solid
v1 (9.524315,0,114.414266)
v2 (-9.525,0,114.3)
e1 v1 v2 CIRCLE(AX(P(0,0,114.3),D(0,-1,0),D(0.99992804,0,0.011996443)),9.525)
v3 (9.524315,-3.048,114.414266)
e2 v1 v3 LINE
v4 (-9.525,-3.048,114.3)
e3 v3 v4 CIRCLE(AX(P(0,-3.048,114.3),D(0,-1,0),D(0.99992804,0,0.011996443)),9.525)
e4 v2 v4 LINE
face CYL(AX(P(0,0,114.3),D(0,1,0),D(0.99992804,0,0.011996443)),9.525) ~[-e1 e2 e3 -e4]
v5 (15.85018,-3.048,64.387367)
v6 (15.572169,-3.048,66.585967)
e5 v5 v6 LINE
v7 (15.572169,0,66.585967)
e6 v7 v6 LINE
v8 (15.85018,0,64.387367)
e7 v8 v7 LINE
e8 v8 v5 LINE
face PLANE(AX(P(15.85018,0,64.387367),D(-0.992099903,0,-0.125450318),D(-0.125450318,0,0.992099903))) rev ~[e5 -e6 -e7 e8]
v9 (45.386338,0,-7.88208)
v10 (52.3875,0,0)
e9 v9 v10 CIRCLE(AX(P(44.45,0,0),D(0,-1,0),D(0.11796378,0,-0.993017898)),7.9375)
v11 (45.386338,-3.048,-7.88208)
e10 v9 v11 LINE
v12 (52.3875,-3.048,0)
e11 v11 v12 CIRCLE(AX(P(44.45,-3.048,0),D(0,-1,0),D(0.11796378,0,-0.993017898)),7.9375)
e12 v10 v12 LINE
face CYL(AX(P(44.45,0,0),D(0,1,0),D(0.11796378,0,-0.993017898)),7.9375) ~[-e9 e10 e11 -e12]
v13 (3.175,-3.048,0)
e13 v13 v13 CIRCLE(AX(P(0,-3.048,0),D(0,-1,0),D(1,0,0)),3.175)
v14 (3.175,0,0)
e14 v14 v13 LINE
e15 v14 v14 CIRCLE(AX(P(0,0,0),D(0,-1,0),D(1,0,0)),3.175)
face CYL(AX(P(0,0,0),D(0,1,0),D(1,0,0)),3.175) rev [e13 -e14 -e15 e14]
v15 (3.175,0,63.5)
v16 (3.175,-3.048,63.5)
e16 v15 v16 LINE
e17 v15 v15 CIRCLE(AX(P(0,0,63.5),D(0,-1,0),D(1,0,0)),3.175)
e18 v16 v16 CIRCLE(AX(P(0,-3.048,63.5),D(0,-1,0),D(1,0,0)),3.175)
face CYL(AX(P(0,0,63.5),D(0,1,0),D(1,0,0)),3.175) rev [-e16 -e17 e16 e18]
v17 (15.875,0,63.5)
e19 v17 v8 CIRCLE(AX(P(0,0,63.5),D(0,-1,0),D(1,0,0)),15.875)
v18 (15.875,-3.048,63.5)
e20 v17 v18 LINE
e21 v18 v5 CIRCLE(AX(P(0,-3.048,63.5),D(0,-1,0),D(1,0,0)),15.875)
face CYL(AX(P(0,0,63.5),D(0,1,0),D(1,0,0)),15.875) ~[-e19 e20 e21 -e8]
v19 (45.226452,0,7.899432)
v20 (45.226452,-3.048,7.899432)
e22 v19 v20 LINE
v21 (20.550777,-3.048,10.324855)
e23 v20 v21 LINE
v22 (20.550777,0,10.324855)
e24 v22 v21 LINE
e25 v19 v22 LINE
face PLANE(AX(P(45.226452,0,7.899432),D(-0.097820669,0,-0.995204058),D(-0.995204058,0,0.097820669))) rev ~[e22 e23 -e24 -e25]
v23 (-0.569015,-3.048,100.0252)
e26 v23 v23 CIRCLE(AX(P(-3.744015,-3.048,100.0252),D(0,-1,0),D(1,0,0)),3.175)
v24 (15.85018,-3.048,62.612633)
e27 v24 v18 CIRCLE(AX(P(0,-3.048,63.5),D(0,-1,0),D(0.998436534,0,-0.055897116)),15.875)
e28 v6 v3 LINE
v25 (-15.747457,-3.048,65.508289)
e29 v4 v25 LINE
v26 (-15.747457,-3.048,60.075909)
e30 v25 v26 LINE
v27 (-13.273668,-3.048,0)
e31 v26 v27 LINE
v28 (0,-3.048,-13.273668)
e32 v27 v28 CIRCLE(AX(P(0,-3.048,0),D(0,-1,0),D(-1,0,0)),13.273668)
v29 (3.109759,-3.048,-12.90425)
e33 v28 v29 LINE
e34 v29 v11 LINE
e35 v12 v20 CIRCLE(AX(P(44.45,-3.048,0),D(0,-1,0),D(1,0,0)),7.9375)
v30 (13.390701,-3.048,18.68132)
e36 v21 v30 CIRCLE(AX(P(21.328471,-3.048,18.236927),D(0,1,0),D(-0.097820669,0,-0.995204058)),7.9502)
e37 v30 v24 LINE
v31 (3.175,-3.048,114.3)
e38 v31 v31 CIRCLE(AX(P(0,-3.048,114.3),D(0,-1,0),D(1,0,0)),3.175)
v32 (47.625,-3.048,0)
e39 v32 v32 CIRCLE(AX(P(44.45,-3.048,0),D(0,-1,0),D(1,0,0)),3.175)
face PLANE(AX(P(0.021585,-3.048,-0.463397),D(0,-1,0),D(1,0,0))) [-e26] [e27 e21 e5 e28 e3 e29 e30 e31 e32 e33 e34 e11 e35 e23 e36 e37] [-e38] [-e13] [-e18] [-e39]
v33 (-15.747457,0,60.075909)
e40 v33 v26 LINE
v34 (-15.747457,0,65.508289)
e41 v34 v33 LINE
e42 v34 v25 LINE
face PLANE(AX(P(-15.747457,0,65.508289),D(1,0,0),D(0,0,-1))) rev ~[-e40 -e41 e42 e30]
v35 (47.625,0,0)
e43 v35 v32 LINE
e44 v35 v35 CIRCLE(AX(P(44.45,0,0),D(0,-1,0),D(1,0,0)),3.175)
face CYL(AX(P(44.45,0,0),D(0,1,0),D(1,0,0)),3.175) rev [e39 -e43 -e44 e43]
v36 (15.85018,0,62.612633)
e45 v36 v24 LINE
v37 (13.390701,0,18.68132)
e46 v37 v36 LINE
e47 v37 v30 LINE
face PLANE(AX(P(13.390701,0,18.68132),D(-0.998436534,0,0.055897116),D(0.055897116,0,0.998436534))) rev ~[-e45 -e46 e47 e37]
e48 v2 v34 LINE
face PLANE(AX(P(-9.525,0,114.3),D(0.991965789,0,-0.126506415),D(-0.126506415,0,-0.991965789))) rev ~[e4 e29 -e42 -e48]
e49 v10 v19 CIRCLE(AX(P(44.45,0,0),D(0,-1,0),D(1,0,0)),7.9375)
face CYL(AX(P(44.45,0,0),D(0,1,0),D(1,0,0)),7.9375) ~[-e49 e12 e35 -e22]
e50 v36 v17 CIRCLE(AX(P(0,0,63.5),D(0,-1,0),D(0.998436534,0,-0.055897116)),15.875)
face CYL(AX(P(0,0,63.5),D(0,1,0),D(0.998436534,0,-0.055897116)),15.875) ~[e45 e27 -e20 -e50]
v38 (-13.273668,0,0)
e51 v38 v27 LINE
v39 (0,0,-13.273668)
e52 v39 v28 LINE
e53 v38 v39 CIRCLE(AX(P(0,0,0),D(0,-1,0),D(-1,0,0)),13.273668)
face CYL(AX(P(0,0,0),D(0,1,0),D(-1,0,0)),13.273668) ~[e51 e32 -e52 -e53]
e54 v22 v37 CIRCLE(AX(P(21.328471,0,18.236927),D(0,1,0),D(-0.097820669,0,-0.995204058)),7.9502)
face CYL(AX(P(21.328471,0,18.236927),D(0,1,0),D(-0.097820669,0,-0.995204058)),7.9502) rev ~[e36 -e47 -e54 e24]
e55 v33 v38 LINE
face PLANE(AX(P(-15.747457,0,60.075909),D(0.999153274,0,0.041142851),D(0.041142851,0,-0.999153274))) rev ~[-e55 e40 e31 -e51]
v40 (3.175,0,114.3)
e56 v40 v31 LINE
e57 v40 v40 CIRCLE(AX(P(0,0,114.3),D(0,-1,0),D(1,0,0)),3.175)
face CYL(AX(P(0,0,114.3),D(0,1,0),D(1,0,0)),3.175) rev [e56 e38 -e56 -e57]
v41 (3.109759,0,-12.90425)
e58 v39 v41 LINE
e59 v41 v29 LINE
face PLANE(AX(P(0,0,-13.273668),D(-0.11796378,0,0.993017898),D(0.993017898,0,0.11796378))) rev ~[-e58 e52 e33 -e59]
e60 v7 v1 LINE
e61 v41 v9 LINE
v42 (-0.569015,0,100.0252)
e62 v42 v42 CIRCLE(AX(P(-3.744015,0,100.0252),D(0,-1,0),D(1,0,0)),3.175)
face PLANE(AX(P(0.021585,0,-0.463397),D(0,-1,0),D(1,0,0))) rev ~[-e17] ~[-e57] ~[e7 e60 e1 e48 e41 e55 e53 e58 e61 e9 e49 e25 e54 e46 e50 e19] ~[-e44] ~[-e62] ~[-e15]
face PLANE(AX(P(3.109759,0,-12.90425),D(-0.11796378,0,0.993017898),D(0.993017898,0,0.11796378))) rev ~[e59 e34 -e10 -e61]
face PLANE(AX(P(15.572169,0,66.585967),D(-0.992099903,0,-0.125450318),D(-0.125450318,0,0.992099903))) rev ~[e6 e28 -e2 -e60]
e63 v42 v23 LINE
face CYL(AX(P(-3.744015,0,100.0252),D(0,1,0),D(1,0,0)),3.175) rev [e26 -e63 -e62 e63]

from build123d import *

# Parameters (mm, degrees)
F0_R     = 3.175
F1_DEPTH = 3.048


with BuildPart() as f1:
    # F0 (on Front) → F1 (new body)
    with BuildSketch(Plane.XZ):
        with BuildLine():
            ThreePointArc((3.1097588161, -12.904249902), (10.427563759, -8.2131710978), (13.2736681226, 0))
            ThreePointArc((13.2736681226, 0), (0, 13.2736681226), (-13.2736681226, 0))
            ThreePointArc((-13.2736681226, 0), (-9.3859007407, -9.3859007407), (0, -13.2736681226))
            Line((0, -13.2736681226), (3.1097588161, -12.904249902))
        make_face()
        Circle(F0_R, mode=Mode.SUBTRACT)
        with BuildLine():
            ThreePointArc((-13.2736681226, 0), (0, 13.2736681226), (13.2736681226, 0))
            ThreePointArc((13.2736681226, 0), (10.427563759, -8.2131710978), (3.1097588161, -12.904249902))
            Line((3.1097588161, -12.904249902), (45.3863375042, -7.8820795688))
            ThreePointArc((45.3863375042, -7.8820795688), (36.5129073275, -0.0804124208), (45.2264515588, 7.8994322091))
            Line((45.2264515588, 7.8994322091), (20.5507771811, 10.3248553698))
            ThreePointArc((20.5507771811, 10.3248553698), (15.2912984453, 13.0640911975), (13.39070093, 18.6813199251))
            Line((13.39070093, 18.6813199251), (15.8501799769, 62.6126332776))
            ThreePointArc((15.8501799769, 62.6126332776), (0.5628098086, 47.6349796685), (-15.7474569047, 61.4917106696))
            Line((-15.7474569047, 61.4917106696), (-15.7474569047, 60.0759088993))
            Line((-15.7474569047, 60.0759088993), (-13.2736681226, 0))
        make_face()
        with BuildLine():
            ThreePointArc((45.2264515588, 7.8994322091), (36.5129073275, -0.0804124208), (45.3863375042, -7.8820795688))
            ThreePointArc((45.3863375042, -7.8820795688), (50.3844791342, -5.2712298048), (52.3875, 0))
            ThreePointArc((52.3875, 0), (50.3307733547, 5.3310797219), (45.2264515588, 7.8994322091))
        make_face()
        with Locations((44.45, 0)):
            Circle(F0_R, mode=Mode.SUBTRACT)
        with BuildLine():
            Line((-15.7474569047, 65.5082893304), (-15.7474569047, 61.4917106696))
            ThreePointArc((-15.7474569047, 61.4917106696), (0.5628098086, 47.6349796685), (15.8501799769, 62.6126332776))
            ThreePointArc((15.8501799769, 62.6126332776), (15.8687937811, 63.0561431161), (15.875, 63.5))
            ThreePointArc((15.875, 63.5), (15.8687937811, 63.9438568839), (15.8501799769, 64.3873667224))
            Line((15.8501799769, 64.3873667224), (15.5721686032, 66.5859666221))
            ThreePointArc((15.5721686032, 66.5859666221), (-0.5459199423, 79.3656104962), (-15.7474569047, 65.5082893304))
        make_face()
        with Locations((0, 63.5)):
            Circle(F0_R, mode=Mode.SUBTRACT)
        with BuildLine():
            Line((-9.525, 114.3), (-15.7474569047, 65.5082893304))
            ThreePointArc((-15.7474569047, 65.5082893304), (-0.5459199423, 79.3656104962), (15.5721686032, 66.5859666221))
            Line((15.5721686032, 66.5859666221), (9.5243145818, 114.4142661242))
            ThreePointArc((9.5243145818, 114.4142661242), (9.5248286439, 114.3571340899), (9.525, 114.3))
            ThreePointArc((9.525, 114.3), (0, 104.775), (-9.525, 114.3))
        make_face()
        with Locations((-3.7440145388, 100.0252)):
            Circle(F0_R, mode=Mode.SUBTRACT)
        with BuildLine():
            ThreePointArc((9.5243145818, 114.4142661242), (-0.0571340899, 123.8248286439), (-9.525, 114.3))
            ThreePointArc((-9.525, 114.3), (0, 104.775), (9.525, 114.3))
            ThreePointArc((9.525, 114.3), (9.5248286439, 114.3571340899), (9.5243145818, 114.4142661242))
        make_face()
        with Locations((0, 114.3)):
            Circle(F0_R, mode=Mode.SUBTRACT)
    extrude(amount=F1_DEPTH)


solid = f1.part
